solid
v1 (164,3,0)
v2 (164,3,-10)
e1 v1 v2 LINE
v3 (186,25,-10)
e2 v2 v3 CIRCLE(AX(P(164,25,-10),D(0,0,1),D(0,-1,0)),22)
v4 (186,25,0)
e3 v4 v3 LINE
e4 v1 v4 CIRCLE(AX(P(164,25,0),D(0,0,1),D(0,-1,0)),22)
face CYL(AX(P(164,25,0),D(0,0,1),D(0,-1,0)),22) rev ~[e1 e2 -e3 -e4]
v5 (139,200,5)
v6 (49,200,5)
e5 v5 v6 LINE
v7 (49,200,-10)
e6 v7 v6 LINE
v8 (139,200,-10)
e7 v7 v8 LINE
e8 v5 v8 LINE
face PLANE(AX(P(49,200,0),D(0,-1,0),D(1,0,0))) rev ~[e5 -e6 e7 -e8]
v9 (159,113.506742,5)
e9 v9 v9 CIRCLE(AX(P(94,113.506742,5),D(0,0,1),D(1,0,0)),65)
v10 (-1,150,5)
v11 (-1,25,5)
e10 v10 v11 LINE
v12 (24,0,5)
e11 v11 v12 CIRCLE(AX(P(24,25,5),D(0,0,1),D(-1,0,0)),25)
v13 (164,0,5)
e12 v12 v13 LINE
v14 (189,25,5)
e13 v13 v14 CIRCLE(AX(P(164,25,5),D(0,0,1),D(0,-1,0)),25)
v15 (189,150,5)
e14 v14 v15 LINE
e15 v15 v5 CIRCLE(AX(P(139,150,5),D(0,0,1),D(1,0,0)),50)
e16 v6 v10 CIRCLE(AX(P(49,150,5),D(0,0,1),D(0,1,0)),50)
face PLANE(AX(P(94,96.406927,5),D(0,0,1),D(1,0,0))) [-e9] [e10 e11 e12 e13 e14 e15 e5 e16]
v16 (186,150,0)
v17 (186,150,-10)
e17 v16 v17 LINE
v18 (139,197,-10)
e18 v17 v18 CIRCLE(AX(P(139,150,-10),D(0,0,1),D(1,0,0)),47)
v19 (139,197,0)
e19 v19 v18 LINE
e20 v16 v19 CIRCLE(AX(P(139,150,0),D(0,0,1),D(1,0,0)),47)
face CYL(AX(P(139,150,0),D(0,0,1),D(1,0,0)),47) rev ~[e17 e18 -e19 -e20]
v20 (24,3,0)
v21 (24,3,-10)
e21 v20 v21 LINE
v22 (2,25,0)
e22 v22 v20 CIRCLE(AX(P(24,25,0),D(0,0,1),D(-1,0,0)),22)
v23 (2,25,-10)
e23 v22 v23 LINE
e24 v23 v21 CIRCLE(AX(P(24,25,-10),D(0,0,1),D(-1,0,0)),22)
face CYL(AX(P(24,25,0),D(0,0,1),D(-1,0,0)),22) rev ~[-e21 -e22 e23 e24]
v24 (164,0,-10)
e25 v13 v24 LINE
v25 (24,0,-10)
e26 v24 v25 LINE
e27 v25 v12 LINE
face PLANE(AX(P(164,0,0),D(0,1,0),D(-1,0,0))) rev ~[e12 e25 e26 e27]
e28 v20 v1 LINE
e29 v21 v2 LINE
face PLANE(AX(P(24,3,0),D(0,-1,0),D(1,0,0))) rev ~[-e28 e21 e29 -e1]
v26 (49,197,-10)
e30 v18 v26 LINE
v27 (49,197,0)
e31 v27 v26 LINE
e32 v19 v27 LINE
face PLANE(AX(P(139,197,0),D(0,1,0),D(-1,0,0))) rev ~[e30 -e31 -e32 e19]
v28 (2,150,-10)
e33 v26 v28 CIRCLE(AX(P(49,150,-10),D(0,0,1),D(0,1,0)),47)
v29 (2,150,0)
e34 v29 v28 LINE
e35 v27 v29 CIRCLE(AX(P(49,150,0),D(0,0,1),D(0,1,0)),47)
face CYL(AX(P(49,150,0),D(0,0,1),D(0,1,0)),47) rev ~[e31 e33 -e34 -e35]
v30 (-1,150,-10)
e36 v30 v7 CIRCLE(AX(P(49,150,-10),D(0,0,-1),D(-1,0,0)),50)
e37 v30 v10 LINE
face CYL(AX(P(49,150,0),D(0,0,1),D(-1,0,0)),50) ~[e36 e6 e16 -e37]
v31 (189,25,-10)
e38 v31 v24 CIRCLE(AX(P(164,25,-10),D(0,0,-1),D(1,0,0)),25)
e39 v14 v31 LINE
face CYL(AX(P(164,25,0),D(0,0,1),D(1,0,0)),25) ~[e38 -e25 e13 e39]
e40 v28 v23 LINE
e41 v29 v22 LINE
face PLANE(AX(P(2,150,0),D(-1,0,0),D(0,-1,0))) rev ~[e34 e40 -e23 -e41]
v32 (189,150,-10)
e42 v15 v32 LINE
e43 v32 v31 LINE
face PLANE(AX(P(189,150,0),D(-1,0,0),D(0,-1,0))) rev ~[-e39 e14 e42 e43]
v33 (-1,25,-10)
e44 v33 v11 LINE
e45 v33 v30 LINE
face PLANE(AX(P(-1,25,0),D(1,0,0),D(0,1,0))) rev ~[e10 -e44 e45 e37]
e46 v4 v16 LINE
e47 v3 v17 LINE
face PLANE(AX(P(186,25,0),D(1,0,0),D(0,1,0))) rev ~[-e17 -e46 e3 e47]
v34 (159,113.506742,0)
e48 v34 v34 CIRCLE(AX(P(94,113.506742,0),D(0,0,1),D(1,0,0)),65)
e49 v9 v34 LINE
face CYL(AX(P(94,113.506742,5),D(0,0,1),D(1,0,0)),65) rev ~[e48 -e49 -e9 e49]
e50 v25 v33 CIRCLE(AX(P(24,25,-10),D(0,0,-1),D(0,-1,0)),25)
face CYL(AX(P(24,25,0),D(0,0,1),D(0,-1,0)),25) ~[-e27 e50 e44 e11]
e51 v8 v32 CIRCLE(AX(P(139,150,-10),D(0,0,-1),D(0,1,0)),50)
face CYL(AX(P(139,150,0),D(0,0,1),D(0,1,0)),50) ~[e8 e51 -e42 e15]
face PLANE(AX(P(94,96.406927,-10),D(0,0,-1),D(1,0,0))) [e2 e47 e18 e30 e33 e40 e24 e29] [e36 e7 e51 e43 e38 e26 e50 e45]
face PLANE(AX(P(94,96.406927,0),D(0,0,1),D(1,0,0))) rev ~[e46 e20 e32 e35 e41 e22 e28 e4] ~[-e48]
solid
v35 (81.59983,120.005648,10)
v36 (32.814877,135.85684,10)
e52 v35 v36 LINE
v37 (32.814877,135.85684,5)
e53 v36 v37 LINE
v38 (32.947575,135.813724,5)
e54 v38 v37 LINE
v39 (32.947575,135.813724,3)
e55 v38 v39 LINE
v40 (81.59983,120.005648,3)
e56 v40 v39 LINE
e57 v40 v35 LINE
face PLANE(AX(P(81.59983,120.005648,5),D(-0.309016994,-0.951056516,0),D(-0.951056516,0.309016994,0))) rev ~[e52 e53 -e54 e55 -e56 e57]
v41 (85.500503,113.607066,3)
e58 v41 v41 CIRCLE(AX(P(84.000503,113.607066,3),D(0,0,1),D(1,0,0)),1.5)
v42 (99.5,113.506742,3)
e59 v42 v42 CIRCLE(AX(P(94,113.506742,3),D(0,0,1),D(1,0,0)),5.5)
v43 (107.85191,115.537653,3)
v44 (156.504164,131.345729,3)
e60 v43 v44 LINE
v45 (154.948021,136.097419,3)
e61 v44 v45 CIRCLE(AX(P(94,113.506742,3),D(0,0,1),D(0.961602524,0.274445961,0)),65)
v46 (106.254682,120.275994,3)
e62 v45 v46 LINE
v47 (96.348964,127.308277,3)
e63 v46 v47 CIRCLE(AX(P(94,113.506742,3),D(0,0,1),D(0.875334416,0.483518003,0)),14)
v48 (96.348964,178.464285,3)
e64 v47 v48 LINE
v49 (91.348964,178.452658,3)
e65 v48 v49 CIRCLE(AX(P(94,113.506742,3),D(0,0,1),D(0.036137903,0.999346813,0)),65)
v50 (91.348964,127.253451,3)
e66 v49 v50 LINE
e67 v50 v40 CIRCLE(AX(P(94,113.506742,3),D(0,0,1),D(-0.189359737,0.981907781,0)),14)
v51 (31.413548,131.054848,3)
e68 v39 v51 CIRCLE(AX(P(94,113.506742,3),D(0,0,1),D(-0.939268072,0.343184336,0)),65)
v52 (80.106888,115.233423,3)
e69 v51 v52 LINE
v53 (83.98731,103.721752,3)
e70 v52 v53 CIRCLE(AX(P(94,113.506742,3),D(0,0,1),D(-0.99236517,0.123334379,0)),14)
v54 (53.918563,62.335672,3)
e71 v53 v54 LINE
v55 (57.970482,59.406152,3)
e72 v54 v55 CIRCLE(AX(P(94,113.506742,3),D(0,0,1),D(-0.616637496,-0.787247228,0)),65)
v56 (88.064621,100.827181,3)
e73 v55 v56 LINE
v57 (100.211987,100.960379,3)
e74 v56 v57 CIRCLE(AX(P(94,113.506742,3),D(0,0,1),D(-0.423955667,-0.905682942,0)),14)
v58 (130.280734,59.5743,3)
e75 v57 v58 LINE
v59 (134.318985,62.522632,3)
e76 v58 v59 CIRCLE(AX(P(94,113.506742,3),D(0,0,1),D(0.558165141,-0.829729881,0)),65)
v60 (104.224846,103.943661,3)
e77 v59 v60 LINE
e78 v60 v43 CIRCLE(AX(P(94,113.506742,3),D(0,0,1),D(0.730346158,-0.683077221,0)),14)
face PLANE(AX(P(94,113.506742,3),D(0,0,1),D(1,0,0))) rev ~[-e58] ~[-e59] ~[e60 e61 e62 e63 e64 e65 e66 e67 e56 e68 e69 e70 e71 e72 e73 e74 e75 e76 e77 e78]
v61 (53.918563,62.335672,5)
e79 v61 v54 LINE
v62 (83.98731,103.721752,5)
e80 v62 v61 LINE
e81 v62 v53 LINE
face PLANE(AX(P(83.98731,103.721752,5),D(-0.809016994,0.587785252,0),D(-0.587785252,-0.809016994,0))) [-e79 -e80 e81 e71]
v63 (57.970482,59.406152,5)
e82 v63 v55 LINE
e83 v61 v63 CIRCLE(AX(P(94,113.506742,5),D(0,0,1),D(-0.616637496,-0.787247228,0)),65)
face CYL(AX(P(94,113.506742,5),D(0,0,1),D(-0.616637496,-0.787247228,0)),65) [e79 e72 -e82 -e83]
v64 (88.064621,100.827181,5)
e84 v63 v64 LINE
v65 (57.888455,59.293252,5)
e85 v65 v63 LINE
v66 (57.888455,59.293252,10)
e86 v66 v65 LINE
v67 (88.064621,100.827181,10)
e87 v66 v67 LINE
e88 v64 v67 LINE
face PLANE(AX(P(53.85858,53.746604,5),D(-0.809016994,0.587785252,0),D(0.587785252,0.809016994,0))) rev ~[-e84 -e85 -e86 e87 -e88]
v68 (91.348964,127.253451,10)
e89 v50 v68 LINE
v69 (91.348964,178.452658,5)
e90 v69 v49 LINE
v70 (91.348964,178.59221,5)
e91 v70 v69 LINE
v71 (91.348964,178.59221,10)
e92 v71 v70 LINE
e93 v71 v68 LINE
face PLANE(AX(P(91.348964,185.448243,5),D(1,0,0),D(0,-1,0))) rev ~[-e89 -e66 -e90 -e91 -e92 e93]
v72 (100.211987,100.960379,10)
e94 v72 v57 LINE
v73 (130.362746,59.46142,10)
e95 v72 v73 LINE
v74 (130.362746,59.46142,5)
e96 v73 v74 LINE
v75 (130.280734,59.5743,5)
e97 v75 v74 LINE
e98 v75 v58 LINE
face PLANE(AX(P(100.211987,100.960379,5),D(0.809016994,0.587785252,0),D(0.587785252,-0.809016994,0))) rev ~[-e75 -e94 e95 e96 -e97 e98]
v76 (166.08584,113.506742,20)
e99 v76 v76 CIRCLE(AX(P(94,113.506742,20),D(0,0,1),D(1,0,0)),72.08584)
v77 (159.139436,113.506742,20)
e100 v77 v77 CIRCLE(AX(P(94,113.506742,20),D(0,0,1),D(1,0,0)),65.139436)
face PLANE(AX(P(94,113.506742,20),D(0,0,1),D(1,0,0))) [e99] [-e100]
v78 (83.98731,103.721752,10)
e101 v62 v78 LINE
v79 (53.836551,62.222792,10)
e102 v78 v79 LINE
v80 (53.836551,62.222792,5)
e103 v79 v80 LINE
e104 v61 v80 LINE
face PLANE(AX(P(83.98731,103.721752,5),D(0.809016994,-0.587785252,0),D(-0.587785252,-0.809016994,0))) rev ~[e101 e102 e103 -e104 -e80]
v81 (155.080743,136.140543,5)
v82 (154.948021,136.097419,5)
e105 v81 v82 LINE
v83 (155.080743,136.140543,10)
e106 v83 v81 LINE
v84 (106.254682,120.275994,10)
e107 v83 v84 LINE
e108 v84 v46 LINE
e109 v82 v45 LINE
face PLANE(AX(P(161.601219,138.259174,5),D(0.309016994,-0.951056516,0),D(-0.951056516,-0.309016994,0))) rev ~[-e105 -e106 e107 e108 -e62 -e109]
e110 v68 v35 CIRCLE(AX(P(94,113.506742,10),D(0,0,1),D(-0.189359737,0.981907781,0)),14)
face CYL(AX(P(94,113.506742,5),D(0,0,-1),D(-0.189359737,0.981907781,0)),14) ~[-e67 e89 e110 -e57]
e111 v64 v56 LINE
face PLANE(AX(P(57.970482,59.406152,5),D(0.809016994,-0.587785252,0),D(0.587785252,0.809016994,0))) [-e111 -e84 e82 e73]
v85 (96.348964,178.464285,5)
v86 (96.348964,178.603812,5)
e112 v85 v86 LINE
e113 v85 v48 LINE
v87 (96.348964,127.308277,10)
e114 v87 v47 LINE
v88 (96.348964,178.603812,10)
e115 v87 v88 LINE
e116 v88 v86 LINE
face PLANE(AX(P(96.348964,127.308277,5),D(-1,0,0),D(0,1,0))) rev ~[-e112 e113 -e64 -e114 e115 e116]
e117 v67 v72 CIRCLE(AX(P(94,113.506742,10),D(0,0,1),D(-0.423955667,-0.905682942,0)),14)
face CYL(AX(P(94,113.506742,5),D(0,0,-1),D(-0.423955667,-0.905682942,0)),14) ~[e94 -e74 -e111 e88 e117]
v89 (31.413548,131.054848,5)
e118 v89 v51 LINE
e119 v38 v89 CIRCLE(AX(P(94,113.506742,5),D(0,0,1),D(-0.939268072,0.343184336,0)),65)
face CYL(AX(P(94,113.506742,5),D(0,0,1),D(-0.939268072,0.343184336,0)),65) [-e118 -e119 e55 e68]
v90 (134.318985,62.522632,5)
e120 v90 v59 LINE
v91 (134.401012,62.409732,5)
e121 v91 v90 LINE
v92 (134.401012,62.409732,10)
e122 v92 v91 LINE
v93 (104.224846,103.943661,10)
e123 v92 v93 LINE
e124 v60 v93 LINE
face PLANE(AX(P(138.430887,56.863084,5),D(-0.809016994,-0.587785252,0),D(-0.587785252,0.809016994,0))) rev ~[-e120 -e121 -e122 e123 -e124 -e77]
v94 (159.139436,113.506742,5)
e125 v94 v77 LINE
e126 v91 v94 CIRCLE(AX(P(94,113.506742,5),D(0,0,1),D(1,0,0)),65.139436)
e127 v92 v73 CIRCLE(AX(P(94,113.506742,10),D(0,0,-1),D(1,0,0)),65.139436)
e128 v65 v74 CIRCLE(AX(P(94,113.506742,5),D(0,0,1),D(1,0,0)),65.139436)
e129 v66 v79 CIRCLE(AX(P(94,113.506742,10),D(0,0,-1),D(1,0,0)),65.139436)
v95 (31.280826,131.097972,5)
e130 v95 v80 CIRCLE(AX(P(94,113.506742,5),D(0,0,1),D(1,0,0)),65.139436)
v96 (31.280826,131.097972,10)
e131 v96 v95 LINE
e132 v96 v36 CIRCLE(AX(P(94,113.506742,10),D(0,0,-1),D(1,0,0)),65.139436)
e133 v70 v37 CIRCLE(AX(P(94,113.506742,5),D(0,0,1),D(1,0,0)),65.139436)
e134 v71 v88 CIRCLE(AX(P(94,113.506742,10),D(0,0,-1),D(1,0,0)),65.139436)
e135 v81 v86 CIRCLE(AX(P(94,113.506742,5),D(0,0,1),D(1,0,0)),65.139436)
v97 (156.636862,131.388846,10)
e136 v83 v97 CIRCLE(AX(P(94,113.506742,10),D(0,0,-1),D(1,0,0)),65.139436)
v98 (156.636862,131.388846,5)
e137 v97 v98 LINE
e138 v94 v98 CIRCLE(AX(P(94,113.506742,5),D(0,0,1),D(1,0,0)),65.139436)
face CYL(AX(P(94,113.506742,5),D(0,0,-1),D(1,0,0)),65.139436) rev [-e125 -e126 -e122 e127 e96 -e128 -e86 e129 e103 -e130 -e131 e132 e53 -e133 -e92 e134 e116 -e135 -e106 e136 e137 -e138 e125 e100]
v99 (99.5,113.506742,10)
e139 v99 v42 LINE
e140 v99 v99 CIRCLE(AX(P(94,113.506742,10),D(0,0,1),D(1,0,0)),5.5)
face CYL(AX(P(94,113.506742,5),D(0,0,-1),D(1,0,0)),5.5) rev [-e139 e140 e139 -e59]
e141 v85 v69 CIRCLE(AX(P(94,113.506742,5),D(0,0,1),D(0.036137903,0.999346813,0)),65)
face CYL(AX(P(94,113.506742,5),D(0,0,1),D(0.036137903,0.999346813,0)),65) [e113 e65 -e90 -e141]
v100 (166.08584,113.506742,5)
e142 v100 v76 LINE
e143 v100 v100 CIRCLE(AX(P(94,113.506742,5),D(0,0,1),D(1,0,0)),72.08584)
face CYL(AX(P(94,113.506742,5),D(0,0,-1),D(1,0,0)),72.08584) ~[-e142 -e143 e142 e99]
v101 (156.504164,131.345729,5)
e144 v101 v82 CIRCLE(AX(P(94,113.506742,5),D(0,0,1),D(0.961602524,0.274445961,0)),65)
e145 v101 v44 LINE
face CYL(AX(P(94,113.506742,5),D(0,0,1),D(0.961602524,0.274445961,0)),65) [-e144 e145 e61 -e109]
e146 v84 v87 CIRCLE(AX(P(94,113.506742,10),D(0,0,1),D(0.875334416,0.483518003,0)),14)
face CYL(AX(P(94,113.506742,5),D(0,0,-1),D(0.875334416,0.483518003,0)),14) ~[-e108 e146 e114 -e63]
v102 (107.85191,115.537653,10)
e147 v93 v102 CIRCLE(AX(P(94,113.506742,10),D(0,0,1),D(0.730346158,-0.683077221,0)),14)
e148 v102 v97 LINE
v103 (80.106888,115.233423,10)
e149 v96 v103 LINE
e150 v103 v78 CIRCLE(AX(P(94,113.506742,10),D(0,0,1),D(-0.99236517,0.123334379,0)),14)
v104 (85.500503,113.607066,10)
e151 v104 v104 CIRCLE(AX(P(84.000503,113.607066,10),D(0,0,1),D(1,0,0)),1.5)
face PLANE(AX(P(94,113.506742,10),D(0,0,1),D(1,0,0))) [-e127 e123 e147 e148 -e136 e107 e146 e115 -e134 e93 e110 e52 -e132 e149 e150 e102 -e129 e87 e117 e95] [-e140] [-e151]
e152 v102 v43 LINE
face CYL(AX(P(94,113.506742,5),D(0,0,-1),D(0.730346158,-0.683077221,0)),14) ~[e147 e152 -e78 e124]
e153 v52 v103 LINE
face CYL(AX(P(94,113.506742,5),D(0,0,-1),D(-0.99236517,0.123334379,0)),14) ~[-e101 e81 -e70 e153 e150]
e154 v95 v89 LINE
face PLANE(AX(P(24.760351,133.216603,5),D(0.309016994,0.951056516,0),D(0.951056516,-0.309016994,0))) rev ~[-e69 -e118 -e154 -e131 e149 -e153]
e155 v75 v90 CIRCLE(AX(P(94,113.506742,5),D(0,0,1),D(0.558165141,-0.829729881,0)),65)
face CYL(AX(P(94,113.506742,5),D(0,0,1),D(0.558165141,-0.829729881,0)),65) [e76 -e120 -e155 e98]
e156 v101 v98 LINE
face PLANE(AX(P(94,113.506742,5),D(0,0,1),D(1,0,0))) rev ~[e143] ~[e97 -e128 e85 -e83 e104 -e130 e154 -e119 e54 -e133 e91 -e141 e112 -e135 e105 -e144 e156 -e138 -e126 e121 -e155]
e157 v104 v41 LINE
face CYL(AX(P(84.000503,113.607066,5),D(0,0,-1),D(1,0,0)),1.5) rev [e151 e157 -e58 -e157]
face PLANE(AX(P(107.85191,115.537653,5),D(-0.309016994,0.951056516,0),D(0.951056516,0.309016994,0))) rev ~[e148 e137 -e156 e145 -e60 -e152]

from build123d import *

# Parameters (mm, degrees)
F1_DEPTH  = 5
F3_DEPTH  = 10
F4_R      = 65
F5_DEPTH  = 25
F6_R      = 1.5
F6_R_2    = 5.5
F7_DEPTH  = 2
F8_R      = 5
F9_DEPTH  = 25
F10_R     = 1.5
F11_DEPTH = 25
F12_DEPTH = 25
F13_DEPTH = 25
F14_R     = 72.085840391
F14_R_2   = 65.1394362423
F15_DEPTH = 15
F16_DEPTH = 5


with BuildPart() as f1:
    # F0 (on Top) → F1 (new body)
    with BuildSketch(Plane.XY):
        with BuildLine():
            Line((139, 200), (49, 200))
            ThreePointArc((49, 200), (13.6446609407, 185.3553390593), (-1, 150))
            Line((-1, 150), (-1, 25))
            ThreePointArc((-1, 25), (6.3223304703, 7.3223304703), (24, 0))
            Line((24, 0), (164, 0))
            ThreePointArc((164, 0), (181.6776695297, 7.3223304703), (189, 25))
            Line((189, 25), (189, 150))
            ThreePointArc((189, 150), (174.3553390593, 185.3553390593), (139, 200))
        make_face()
    extrude(amount=F1_DEPTH)

    # F2 (on face) → F3 (join)
    with BuildSketch(Plane(origin=(0, 0, 0), x_dir=(1, 0, 0), z_dir=(0, 0, -1))):
        with BuildLine():
            Line((49, -200), (139, -200))
            ThreePointArc((139, -200), (174.3553390593, -185.3553390593), (189, -150))
            Line((189, -150), (189, -25))
            ThreePointArc((189, -25), (181.6776695297, -7.3223304703), (164, 0))
            Line((164, 0), (24, 0))
            ThreePointArc((24, 0), (6.3223304703, -7.3223304703), (-1, -25))
            Line((-1, -25), (-1, -150))
            ThreePointArc((-1, -150), (13.6446609407, -185.3553390593), (49, -200))
        make_face()
        with BuildLine():
            Line((186, -25), (186, -150))
            ThreePointArc((186, -150), (172.2340187158, -183.2340187158), (139, -197))
            Line((139, -197), (49, -197))
            ThreePointArc((49, -197), (15.7659812842, -183.2340187158), (2, -150))
            Line((2, -150), (2, -25))
            ThreePointArc((2, -25), (8.4436508139, -9.4436508139), (24, -3))
            Line((24, -3), (164, -3))
            ThreePointArc((164, -3), (179.5563491861, -9.4436508139), (186, -25))
        make_face(mode=Mode.SUBTRACT)
    extrude(amount=F3_DEPTH)

    # F4 (on face) → F5 (cut)
    with BuildSketch(Plane.XY.offset(5)):
        with Locations((94, 113.5067418218)):
            Circle(F4_R)
    extrude(amount=-F5_DEPTH, mode=Mode.SUBTRACT)

    # F8 (on face) → F9 (cut)
    with BuildSketch(Plane(origin=(0, 0, 3), x_dir=(1, 0, 0), z_dir=(0, 0, -1))):
        with Locations((94, -113.5067418218)):
            Circle(F8_R)
    extrude(amount=-F9_DEPTH, mode=Mode.SUBTRACT)

    # F10 (on face) → F11 (cut)
    with BuildSketch(Plane(origin=(0, 0, 3), x_dir=(1, 0, 0), z_dir=(0, 0, -1))):
        with Locations((94.0000067605, 105.5067418218)):
            Circle(F10_R)
        with Locations((86, 113.5067350613)):
            Circle(F10_R)
        with Locations((93.9999932395, 121.5067418218)):
            Circle(F10_R)
        with Locations((102, 113.5067485823)):
            Circle(F10_R)
    extrude(amount=-F11_DEPTH, mode=Mode.SUBTRACT)

    # F10 (on face) → F12 (cut)
    with BuildSketch(Plane(origin=(0, 0, 3), x_dir=(1, 0, 0), z_dir=(0, 0, -1))):
        with Locations((86, 113.5067350613)):
            Circle(F10_R)
        with Locations((94.0000067605, 105.5067418218)):
            Circle(F10_R)
        with Locations((102, 113.5067485823)):
            Circle(F10_R)
        with Locations((93.9999932395, 121.5067418218)):
            Circle(F10_R)
    extrude(amount=-F12_DEPTH, mode=Mode.SUBTRACT)

    # F8 (on face) → F13 (cut)
    with BuildSketch(Plane(origin=(0, 0, 3), x_dir=(1, 0, 0), z_dir=(0, 0, -1))):
        with Locations((94, -113.5067418218)):
            Circle(F8_R)
    extrude(amount=-F13_DEPTH, mode=Mode.SUBTRACT)


with BuildPart() as f7:
    # F6 (on face) → F7 (new body)
    with BuildSketch(Plane.XY.offset(5)):
        with BuildLine():
            Line((91.3489636779, 178.4526578321), (91.3489636779, 127.2534507522))
            ThreePointArc((91.3489636779, 127.2534507522), (85.6473138732, 124.7420715662), (81.5998298548, 120.005647912))
            Line((81.5998298548, 120.005647912), (32.947575311, 135.8137236794))
            ThreePointArc((32.947575311, 135.8137236794), (32.1347862264, 133.4490417079), (31.4135480954, 131.0548482151))
            Line((31.4135480954, 131.0548482151), (80.1068876178, 115.2334231289))
            ThreePointArc((80.1068876178, 115.2334231289), (80.7334444719, 109.0347730807), (83.9873097061, 103.7217516287))
            Line((83.9873097061, 103.7217516287), (53.9185627687, 62.3356719729))
            ThreePointArc((53.9185627687, 62.3356719729), (55.9163433267, 60.8319367021), (57.9704818098, 59.4061520007))
            Line((57.9704818098, 59.4061520007), (88.0646206604, 100.8271806269))
            ThreePointArc((88.0646206604, 100.8271806269), (94.1535038969, 99.5075833987), (100.2119872248, 100.9603792126))
            Line((100.2119872248, 100.9603792126), (130.2807341621, 59.5742995569))
            ThreePointArc((130.2807341621, 59.5742995569), (132.3282195336, 61.0096220209), (134.3189850648, 62.5226321076))
            Line((134.3189850648, 62.5226321076), (104.2248462142, 103.9436607337))
            ThreePointArc((104.2248462142, 103.9436607337), (107.3614261537, 109.3267548435), (107.8519095365, 115.5376534872))
            Line((107.8519095365, 115.5376534872), (156.5041640802, 131.3457292546))
            ThreePointArc((156.5041640803, 131.3457292546), (155.7717990733, 133.736542593), (154.9480213521, 136.0974189533))
            Line((154.9480213521, 136.0974189533), (106.2546818297, 120.2759938671))
            ThreePointArc((106.2546818297, 120.2759938671), (102.1043116043, 124.9225262197), (96.3489636779, 127.3082768683))
            Line((96.3489636779, 127.3082768683), (96.3489636779, 178.4642846451))
            ThreePointArc((96.3489636779, 178.4642846451), (93.8488518399, 178.5065660849), (91.3489636779, 178.4526578321))
        make_face()
        with Locations((84.0005032645, 113.607066474)):
            Circle(F6_R, mode=Mode.SUBTRACT)
        with Locations((94, 113.5067418218)):
            Circle(F6_R_2, mode=Mode.SUBTRACT)
    extrude(amount=-F7_DEPTH)



with BuildPart() as f15:
    # F14 (on face) → F15 (new body)
    with BuildSketch(Plane.XY.offset(5)):
        with Locations((94, 113.5067418218)):
            Circle(F14_R)
        with Locations((94, 113.5067418218)):
            Circle(F14_R_2, mode=Mode.SUBTRACT)
    extrude(amount=F15_DEPTH)


with BuildPart() as f7_1:
    add(f7.part)

    add(f15.part)  # F16 merges F15
    # F6 (on face) → F16 (join)
    with BuildSketch(Plane.XY.offset(5)):
        with BuildLine():
            Line((91.3489636779, 185.4482434715), (91.3489636779, 127.2534507522))
            ThreePointArc((91.3489636779, 127.2534507522), (85.6473138732, 124.7420715662), (81.5998298548, 120.005647912))
            Line((81.5998298548, 120.005647912), (26.3054357596, 137.9718856448))
            Line((26.3054357596, 137.9718856448), (24.7603507878, 133.2166030633))
            Line((24.7603507878, 133.2166030633), (80.1068876178, 115.2334231289))
            ThreePointArc((80.1068876178, 115.2334231289), (80.7334444719, 109.0347730807), (83.9873097061, 103.7217516287))
            Line((83.9873097061, 103.7217516287), (49.813494768, 56.6855305943))
            Line((49.813494768, 56.6855305943), (53.8585797398, 53.7466043329))
            Line((53.8585797398, 53.7466043329), (88.0646206604, 100.8271806269))
            ThreePointArc((88.0646206604, 100.8271806269), (94.1535038969, 99.5075833987), (100.2119872248, 100.9603792126))
            Line((100.2119872248, 100.9603792126), (134.3858021629, 53.9241581783))
            Line((134.3858021629, 53.9241581783), (138.4308871348, 56.8630844397))
            Line((138.4308871348, 56.8630844397), (104.2248462142, 103.9436607337))
            ThreePointArc((104.2248462142, 103.9436607337), (107.3614261537, 109.3267548435), (107.8519095365, 115.5376534872))
            Line((107.8519095365, 115.5376534872), (163.1463036316, 133.50389122))
            Line((163.1463036316, 133.50389122), (161.6012186598, 138.2591738015))
            Line((161.6012186598, 138.2591738015), (106.2546818297, 120.2759938671))
            ThreePointArc((106.2546818297, 120.2759938671), (102.1043116043, 124.9225262197), (96.3489636779, 127.3082768683))
            Line((96.3489636779, 127.3082768683), (96.3489636779, 185.4482434715))
            Line((96.3489636779, 185.4482434715), (91.3489636779, 185.4482434715))
        make_face()
        with Locations((84.0005032645, 113.607066474)):
            Circle(F6_R, mode=Mode.SUBTRACT)
        with Locations((94, 113.5067418218)):
            Circle(F6_R_2, mode=Mode.SUBTRACT)
    extrude(amount=F16_DEPTH)


solid = Compound([f1.part, f7_1.part])
